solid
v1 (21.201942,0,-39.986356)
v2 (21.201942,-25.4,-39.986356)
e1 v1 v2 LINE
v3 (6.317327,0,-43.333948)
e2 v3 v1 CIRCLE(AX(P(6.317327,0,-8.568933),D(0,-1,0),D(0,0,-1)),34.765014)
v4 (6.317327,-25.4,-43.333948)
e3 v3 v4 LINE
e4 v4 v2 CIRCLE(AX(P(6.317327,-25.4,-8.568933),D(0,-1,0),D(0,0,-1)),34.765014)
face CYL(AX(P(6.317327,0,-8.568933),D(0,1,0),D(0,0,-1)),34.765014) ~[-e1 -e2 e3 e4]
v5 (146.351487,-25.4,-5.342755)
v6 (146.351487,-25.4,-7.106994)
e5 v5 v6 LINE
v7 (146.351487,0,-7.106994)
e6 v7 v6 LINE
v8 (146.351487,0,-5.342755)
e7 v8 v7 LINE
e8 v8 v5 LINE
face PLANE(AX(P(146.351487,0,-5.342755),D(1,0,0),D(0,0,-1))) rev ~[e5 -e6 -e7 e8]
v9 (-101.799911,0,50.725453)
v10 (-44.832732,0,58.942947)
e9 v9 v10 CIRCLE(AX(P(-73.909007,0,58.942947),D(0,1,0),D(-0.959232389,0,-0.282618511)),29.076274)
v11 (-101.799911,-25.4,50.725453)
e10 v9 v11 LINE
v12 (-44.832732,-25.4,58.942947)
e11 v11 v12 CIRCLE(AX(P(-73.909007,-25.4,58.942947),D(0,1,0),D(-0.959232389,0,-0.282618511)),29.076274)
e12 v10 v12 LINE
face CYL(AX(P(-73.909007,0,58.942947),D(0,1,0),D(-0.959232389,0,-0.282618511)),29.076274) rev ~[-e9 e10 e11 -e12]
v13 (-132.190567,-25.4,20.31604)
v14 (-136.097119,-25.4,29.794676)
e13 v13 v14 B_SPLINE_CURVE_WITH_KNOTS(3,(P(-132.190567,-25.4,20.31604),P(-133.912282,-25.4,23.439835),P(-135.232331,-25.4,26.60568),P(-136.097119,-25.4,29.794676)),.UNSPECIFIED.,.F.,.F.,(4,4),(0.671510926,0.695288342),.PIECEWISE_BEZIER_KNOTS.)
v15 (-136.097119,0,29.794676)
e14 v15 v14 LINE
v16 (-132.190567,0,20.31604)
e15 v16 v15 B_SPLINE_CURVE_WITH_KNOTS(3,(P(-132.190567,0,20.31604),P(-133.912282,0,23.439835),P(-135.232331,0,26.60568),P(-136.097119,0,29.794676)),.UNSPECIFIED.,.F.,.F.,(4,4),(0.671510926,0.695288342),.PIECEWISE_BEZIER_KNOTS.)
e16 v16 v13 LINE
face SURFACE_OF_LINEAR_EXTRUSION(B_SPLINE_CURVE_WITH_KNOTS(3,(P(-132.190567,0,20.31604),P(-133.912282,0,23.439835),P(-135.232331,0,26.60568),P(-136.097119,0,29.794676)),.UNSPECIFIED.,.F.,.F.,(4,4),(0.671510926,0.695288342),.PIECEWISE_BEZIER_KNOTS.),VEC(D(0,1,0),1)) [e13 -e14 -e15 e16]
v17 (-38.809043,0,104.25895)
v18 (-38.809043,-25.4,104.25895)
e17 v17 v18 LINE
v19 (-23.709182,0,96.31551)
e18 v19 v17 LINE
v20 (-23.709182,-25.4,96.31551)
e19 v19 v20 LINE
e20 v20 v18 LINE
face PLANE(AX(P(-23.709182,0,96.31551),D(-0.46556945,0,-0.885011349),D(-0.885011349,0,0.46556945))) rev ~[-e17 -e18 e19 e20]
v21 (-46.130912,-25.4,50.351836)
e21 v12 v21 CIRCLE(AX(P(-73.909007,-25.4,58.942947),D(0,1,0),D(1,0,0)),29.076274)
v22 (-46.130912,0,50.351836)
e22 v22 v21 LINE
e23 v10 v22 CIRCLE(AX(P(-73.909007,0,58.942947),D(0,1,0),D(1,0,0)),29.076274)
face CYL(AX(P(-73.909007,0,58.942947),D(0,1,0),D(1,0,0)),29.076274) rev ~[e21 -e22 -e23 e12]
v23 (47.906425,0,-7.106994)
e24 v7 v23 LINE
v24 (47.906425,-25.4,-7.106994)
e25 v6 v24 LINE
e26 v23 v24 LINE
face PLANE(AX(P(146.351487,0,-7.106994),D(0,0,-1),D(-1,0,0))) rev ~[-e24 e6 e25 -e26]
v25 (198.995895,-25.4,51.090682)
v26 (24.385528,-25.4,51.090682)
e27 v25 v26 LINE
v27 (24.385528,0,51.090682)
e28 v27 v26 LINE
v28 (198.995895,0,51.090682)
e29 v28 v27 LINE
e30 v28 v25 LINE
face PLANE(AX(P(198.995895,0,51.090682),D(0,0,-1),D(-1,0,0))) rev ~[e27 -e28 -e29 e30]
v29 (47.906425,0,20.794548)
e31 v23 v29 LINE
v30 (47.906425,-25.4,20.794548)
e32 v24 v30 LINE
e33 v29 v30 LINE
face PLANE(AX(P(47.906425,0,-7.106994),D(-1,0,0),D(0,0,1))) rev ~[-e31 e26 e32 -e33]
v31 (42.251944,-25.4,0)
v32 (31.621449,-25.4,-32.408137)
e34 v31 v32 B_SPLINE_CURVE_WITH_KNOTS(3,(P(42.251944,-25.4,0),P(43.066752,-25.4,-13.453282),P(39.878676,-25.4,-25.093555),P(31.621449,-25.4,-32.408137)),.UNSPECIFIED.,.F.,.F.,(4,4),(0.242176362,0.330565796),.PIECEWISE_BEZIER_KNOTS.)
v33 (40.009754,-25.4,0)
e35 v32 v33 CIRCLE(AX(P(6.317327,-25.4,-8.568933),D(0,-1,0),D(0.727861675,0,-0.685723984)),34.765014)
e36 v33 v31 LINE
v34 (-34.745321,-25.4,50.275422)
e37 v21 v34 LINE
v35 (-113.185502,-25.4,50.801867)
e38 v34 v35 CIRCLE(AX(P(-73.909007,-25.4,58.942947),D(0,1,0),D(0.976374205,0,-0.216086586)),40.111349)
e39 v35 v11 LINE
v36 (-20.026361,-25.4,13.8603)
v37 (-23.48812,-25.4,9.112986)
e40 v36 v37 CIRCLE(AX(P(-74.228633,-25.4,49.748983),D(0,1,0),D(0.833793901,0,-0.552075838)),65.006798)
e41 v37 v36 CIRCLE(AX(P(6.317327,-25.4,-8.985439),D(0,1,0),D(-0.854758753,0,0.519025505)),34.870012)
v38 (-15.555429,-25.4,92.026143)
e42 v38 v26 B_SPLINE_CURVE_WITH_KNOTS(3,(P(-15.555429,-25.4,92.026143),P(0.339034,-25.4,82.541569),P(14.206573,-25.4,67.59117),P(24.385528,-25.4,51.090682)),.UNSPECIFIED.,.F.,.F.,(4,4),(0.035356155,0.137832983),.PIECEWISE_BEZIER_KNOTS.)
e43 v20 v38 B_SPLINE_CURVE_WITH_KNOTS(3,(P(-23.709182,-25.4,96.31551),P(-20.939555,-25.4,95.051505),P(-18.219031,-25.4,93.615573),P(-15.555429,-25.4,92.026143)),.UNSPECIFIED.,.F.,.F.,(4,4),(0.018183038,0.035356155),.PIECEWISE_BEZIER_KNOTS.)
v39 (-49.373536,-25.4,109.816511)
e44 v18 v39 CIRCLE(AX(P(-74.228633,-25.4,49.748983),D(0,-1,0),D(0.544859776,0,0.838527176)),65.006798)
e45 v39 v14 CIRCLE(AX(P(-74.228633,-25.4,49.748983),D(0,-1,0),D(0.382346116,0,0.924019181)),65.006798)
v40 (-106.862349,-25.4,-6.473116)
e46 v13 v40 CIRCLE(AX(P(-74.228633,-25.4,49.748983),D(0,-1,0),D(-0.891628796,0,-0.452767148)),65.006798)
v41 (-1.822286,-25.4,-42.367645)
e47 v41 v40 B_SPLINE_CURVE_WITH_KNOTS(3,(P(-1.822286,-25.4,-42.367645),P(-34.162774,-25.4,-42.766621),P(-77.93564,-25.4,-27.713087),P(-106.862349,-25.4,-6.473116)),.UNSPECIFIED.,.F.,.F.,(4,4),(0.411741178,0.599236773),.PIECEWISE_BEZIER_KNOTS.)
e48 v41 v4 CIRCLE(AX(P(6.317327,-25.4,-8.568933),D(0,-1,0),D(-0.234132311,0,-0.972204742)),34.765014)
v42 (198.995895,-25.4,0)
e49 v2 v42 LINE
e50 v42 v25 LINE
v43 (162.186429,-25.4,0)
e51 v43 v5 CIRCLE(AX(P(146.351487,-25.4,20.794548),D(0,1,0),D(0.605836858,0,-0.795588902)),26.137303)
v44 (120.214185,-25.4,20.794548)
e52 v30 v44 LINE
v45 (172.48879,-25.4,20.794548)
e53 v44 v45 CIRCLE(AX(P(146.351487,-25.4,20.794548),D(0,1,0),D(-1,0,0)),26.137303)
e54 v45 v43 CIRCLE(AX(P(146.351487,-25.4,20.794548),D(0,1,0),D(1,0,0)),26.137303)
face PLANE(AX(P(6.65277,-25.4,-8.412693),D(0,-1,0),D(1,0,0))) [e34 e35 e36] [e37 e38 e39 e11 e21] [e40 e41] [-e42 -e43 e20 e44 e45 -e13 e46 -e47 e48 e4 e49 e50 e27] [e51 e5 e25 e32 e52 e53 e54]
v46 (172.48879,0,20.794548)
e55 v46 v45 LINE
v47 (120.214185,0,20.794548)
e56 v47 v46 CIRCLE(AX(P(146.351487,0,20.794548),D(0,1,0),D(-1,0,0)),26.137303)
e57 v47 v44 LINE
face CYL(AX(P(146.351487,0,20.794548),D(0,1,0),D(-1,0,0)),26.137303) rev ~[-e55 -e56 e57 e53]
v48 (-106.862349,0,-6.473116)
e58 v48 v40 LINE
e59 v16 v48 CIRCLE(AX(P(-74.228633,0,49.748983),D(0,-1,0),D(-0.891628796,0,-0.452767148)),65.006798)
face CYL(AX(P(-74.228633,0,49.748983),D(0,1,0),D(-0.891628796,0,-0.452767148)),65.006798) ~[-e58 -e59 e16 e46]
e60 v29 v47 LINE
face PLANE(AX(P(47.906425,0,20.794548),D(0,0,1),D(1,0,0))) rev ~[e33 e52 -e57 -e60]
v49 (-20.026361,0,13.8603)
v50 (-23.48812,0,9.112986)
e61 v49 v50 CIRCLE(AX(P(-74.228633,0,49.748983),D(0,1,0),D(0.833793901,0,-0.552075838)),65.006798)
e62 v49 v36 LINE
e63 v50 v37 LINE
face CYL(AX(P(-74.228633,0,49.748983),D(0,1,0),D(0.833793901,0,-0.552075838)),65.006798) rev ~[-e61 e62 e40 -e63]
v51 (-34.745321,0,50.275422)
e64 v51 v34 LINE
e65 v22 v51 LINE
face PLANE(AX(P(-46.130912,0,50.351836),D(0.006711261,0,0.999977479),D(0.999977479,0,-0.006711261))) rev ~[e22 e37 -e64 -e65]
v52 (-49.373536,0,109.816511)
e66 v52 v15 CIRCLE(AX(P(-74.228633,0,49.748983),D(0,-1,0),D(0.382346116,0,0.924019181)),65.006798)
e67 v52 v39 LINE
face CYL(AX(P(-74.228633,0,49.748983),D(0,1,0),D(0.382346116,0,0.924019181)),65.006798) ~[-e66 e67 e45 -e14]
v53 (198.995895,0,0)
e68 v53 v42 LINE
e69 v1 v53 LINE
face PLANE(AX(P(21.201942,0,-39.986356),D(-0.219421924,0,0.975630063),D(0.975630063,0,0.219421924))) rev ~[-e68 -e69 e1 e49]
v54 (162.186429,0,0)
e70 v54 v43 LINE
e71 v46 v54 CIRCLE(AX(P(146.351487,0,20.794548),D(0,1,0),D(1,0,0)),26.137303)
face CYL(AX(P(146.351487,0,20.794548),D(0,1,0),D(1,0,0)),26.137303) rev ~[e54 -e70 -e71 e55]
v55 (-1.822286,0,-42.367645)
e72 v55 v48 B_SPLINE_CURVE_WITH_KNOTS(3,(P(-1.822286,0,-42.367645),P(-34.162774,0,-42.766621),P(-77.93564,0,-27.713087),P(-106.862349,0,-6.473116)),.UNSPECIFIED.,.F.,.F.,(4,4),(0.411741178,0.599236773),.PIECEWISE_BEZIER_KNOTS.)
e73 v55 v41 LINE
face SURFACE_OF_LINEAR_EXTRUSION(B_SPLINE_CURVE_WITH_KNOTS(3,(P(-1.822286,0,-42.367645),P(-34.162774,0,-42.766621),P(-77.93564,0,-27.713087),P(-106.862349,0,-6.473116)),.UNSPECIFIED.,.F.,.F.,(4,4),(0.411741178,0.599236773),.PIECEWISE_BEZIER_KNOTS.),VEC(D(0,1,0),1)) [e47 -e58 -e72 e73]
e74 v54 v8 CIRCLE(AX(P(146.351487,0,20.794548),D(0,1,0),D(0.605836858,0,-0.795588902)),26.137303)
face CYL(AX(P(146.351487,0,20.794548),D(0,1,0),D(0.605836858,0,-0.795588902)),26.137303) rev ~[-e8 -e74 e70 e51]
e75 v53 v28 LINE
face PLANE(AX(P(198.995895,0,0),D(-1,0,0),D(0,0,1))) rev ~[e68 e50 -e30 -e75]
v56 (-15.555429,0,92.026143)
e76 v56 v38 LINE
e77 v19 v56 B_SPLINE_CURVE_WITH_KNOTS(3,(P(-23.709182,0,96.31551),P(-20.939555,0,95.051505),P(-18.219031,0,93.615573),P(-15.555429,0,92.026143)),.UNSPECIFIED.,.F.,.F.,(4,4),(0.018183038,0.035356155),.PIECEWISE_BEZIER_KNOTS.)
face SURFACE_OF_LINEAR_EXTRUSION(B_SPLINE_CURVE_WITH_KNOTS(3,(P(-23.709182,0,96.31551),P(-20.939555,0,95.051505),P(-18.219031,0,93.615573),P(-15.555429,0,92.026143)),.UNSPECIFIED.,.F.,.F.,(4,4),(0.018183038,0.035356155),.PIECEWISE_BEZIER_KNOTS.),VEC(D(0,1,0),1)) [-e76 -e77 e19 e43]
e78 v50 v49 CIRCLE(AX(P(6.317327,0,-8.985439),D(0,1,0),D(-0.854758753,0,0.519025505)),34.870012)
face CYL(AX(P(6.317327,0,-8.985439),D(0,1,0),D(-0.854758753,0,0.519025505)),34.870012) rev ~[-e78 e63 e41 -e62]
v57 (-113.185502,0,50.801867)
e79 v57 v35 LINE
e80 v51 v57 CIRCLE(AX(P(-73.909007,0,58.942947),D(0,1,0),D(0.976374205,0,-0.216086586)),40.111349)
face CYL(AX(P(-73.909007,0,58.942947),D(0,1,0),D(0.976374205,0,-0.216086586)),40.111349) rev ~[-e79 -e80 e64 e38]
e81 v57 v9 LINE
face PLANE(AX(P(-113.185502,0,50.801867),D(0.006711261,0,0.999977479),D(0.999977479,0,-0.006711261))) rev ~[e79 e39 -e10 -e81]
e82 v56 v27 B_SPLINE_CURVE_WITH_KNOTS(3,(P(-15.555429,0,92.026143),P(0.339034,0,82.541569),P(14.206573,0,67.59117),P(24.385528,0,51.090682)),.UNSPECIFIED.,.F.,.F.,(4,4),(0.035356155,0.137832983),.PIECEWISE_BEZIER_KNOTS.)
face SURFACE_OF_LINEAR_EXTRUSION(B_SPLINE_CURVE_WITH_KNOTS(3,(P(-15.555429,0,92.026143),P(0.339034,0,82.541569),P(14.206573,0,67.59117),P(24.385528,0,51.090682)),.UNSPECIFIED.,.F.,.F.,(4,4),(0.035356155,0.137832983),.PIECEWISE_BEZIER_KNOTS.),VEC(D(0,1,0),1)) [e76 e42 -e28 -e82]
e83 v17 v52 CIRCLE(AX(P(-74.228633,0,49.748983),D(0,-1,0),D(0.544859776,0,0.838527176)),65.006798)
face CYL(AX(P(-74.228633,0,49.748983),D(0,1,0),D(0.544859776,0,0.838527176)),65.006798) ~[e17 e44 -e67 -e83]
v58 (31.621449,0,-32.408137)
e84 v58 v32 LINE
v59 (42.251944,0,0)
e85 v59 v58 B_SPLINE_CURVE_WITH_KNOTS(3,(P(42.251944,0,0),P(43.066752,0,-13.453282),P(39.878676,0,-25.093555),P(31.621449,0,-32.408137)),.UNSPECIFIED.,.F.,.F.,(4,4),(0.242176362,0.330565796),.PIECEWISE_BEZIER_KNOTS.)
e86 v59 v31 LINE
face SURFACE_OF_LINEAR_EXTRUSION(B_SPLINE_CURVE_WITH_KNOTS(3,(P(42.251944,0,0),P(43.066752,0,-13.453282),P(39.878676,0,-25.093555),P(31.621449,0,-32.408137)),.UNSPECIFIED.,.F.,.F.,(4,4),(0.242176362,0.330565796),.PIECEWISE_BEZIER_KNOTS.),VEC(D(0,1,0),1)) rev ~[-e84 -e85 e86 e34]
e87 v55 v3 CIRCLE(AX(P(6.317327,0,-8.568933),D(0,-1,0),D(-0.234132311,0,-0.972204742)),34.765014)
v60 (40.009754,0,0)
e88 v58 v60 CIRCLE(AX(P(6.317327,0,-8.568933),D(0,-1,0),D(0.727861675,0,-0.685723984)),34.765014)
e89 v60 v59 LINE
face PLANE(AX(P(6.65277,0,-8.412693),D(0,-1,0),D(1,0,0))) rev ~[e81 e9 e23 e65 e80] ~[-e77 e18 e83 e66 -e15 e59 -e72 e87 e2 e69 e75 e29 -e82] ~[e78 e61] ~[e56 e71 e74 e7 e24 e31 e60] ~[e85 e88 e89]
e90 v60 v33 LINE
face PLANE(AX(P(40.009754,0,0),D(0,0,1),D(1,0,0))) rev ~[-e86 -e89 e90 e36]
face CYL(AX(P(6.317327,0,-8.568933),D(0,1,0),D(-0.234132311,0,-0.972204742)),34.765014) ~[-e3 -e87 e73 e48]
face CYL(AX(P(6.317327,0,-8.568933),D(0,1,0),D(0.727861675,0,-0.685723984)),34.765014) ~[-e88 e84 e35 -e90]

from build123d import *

# Parameters (mm, degrees)
F1_DEPTH = 25.4


with BuildPart() as f1:
    # F0 (on Front) → F1 (new body)
    with BuildSketch(Plane.XZ):
        with BuildLine():
            ThreePointArc((-23.4881200852, 9.1129863922), (-25.7569087098, 4.6952436795), (-27.3750988376, 0))
            ThreePointArc((-27.3750988376, 0), (-23.4523587377, -26.5236540337), (-1.822285639, -42.3676450379))
            add(Edge.make_bspline(
                [(31.6214489009, -32.408137431), (24.0381488742, -39.1257279454), (12.1793845571, -42.1949100042), (-1.822285639, -42.3676450379)],
                knots=[0.3305657958, 0.3305657958, 0.3305657958, 0.3305657958, 0.4117411776, 0.4117411776, 0.4117411776, 0.4117411776], degree=3))
            ThreePointArc((31.6214489009, -32.408137431), (39.9732334064, -17.2802023076), (40.0097537836, 0))
            Line((40.0097537836, 0), (24.3855283995, 0))
            Line((24.3855283995, 0), (24.3855283995, 20.8383404807))
            ThreePointArc((24.3855283995, 20.8383404808), (0.9049170427, 25.4619632407), (-20.0263610495, 13.8602998023))
            ThreePointArc((-20.0263610495, 13.8602998023), (-21.7035792641, 11.4475130703), (-23.4881200852, 9.1129863922))
        make_face()
        with BuildLine():
            ThreePointArc((-1.822285639, -42.3676450379), (-23.4523587377, -26.5236540337), (-27.3750988376, 0))
            ThreePointArc((-27.3750988376, 0), (-25.7569087098, 4.6952436795), (-23.4881200852, 9.1129863922))
            ThreePointArc((-23.4881200852, 9.1129863922), (-62.2831037982, -14.1508466737), (-106.8623494937, -6.4731163171))
            add(Edge.make_bspline(
                [(-1.822285639, -42.3676450379), (-34.1627739251, -42.7666213928), (-77.9356396487, -27.7130872373), (-106.8623494937, -6.4731163171)],
                knots=[0.4117411776, 0.4117411776, 0.4117411776, 0.4117411776, 0.5992367726, 0.5992367726, 0.5992367726, 0.5992367726], degree=3))
        make_face()
        with BuildLine():
            add(Edge.make_bspline(
                [(31.6214489009, -32.408137431), (24.0381488742, -39.1257279454), (12.1793845571, -42.1949100042), (-1.822285639, -42.3676450379)],
                knots=[0.3305657958, 0.3305657958, 0.3305657958, 0.3305657958, 0.4117411776, 0.4117411776, 0.4117411776, 0.4117411776], degree=3))
            ThreePointArc((-1.822285639, -42.3676450379), (2.2189423584, -43.0915267187), (6.317327473, -43.3339475664))
            Line((6.317327473, -43.3339475664), (21.2019422511, -39.9863561607))
            ThreePointArc((21.2019422511, -39.9863561607), (26.7658232425, -36.6841469116), (31.6214489009, -32.408137431))
        make_face()
        with BuildLine():
            ThreePointArc((-106.8623494937, -6.4731163171), (-62.2831037982, -14.1508466737), (-23.4881200852, 9.1129863922))
            ThreePointArc((-23.4881200852, 9.1129863922), (-21.8574061869, 11.5596842489), (-20.0263610495, 13.8602998023))
            ThreePointArc((-20.0263610495, 13.8602998023), (-11.9815447312, 31.0090830109), (-9.2218346427, 49.7489825666))
            ThreePointArc((-9.2218346427, 49.7489825666), (-15.373040222, 77.3515736193), (-32.6625531747, 99.7304275837))
            add(Edge.make_bspline(
                [(-136.0971185339, 29.794675775), (-147.1795152867, 70.6622045283), (-83.4949169934, 115.3318185014), (-32.6625531747, 99.7304275837)],
                knots=[0.6952883419, 0.6952883419, 0.6952883419, 0.6952883419, 1, 1, 1, 1], degree=3))
            ThreePointArc((-136.0971185339, 29.794675775), (-134.3309912676, 24.9782257744), (-132.1905665466, 20.3160397911))
            add(Edge.make_bspline(
                [(-106.8623494937, -6.4731163171), (-118.0127633165, 1.7142809574), (-126.9572157407, 10.8209088266), (-132.1905665466, 20.3160397911)],
                knots=[0.5992367726, 0.5992367726, 0.5992367726, 0.5992367726, 0.6715109264, 0.6715109264, 0.6715109264, 0.6715109264], degree=3))
        make_face()
        with BuildLine():
            ThreePointArc((-34.7453205512, 50.2754222832), (-74.1782043044, 18.8325014661), (-113.1855020537, 50.8018666913))
            Line((-113.1855020537, 50.8018666913), (-101.7999106632, 50.7254532919))
            ThreePointArc((-101.7999106632, 50.7254532918), (-78.0602804594, 87.7213526899), (-44.8327322387, 58.9429466583))
            ThreePointArc((-44.8327322387, 58.9429466583), (-45.1591089284, 54.5986268514), (-46.1309119417, 50.3518356826))
            Line((-46.1309119417, 50.3518356826), (-34.7453205512, 50.2754222832))
        make_face(mode=Mode.SUBTRACT)
        with BuildLine():
            Line((21.2019422511, -39.9863561607), (6.317327473, -43.3339475664))
            ThreePointArc((6.317327473, -43.3339475664), (13.9455337712, -42.486726351), (21.2019422511, -39.9863561607))
        make_face()
        with BuildLine():
            add(Edge.make_bspline(
                [(42.2519440934, 0), (43.0667519502, -13.4532818738), (39.8786763522, -25.0935550451), (31.6214489009, -32.408137431)],
                knots=[0.2421763625, 0.2421763625, 0.2421763625, 0.2421763625, 0.3305657958, 0.3305657958, 0.3305657958, 0.3305657958], degree=3))
            ThreePointArc((31.6214489009, -32.408137431), (26.7658232425, -36.6841469116), (21.2019422511, -39.9863561607))
            Line((21.2019422511, -39.9863561607), (198.9958948854, 0))
            Line((198.9958948854, 0), (162.1864286042, 0))
            ThreePointArc((162.1864286042, 0), (154.7074790766, -3.9710732295), (146.3514873037, -5.3427547241))
            Line((146.3514873037, -5.3427547241), (146.3514873037, -7.1069937982))
            Line((146.3514873037, -7.1069937982), (47.9064245235, -7.1069937982))
            Line((47.9064245235, -7.1069937982), (47.9064245235, 0))
            Line((47.9064245235, 0), (42.2519440934, 0))
        make_face()
        with BuildLine():
            ThreePointArc((-132.1905665466, 20.3160397911), (-121.4653525437, 5.0883042782), (-106.8623494937, -6.4731163171))
            add(Edge.make_bspline(
                [(-106.8623494937, -6.4731163171), (-118.0127633165, 1.7142809574), (-126.9572157407, 10.8209088266), (-132.1905665466, 20.3160397911)],
                knots=[0.5992367726, 0.5992367726, 0.5992367726, 0.5992367726, 0.6715109264, 0.6715109264, 0.6715109264, 0.6715109264], degree=3))
        make_face()
        with BuildLine():
            ThreePointArc((-9.2218346427, 49.7489825666), (-11.9815447312, 31.0090830109), (-20.0263610495, 13.8602998023))
            ThreePointArc((-20.0263610495, 13.8602998023), (0.9049170427, 25.4619632407), (24.3855283995, 20.8383404808))
            Line((24.3855283995, 20.8383404807), (24.3855283995, 51.0906824548))
            add(Edge.make_bspline(
                [(-15.5554291457, 92.0261433749), (0.3390335994, 82.5415688484), (14.2065732282, 67.591169523), (24.3855283995, 51.0906824548)],
                knots=[0.0353561549, 0.0353561549, 0.0353561549, 0.0353561549, 0.1378329831, 0.1378329831, 0.1378329831, 0.1378329831], degree=3))
            Line((-15.5554291457, 92.0261433749), (-23.7091819765, 96.3155100856))
            add(Edge.make_bspline(
                [(-32.6625531747, 99.7304275837), (-29.6292369493, 98.7994468334), (-26.6416857173, 97.653849539), (-23.7091819765, 96.3155100856)],
                knots=[0, 0, 0, 0, 0.0181830383, 0.0181830383, 0.0181830383, 0.0181830383], degree=3))
            ThreePointArc((-32.6625531747, 99.7304275837), (-15.373040222, 77.3515736193), (-9.2218346427, 49.7489825666))
        make_face()
        with BuildLine():
            Line((24.3855283995, 0), (40.0097537836, 0))
            ThreePointArc((40.0097537836, 0), (34.2162475505, 11.9326862666), (24.3855283995, 20.8383404808))
            Line((24.3855283995, 20.8383404807), (24.3855283995, 0))
        make_face()
        with BuildLine():
            ThreePointArc((24.3855283995, 20.8383404808), (34.2162475505, 11.9326862666), (40.0097537836, 0))
            Line((40.0097537836, 0), (42.2519440934, 0))
            add(Edge.make_bspline(
                [(24.3855283995, 51.0906824548), (34.7498868563, 34.2896493617), (41.2900666127, 15.8815465109), (42.2519440934, 0)],
                knots=[0.1378329831, 0.1378329831, 0.1378329831, 0.1378329831, 0.2421763625, 0.2421763625, 0.2421763625, 0.2421763625], degree=3))
            Line((24.3855283995, 51.0906824548), (24.3855283995, 20.8383404807))
        make_face()
        with BuildLine():
            add(Edge.make_bspline(
                [(24.3855283995, 51.0906824548), (34.7498868563, 34.2896493617), (41.2900666127, 15.8815465109), (42.2519440934, 0)],
                knots=[0.1378329831, 0.1378329831, 0.1378329831, 0.1378329831, 0.2421763625, 0.2421763625, 0.2421763625, 0.2421763625], degree=3))
            Line((42.2519440934, 0), (47.9064245235, 0))
            Line((47.9064245235, 0), (47.9064245235, 20.7945478899))
            Line((47.9064245235, 20.7945478899), (120.2141846897, 20.7945478899))
            ThreePointArc((120.2141846897, 20.7945478899), (146.3514873037, 46.931850504), (172.4887899177, 20.7945478899))
            ThreePointArc((172.4887899177, 20.7945478899), (169.7720043836, 9.1911877022), (162.1864286042, 0))
            Line((162.1864286042, 0), (198.9958948854, 0))
            Line((198.9958948854, 0), (198.9958948854, 51.0906824548))
            Line((198.9958948854, 51.0906824548), (24.3855283995, 51.0906824548))
        make_face()
        with BuildLine():
            add(Edge.make_bspline(
                [(-132.1905665466, 20.3160397911), (-133.9122824029, 23.4398352609), (-135.2323312991, 26.6056799314), (-136.0971185339, 29.794675775)],
                knots=[0.6715109264, 0.6715109264, 0.6715109264, 0.6715109264, 0.6952883419, 0.6952883419, 0.6952883419, 0.6952883419], degree=3))
            ThreePointArc((-132.1905665466, 20.3160397911), (-134.3309912676, 24.9782257744), (-136.0971185339, 29.794675775))
        make_face()
        with BuildLine():
            ThreePointArc((-49.373536191, 109.8165112697), (-118.3123179762, 97.5246309308), (-136.0971185339, 29.794675775))
            add(Edge.make_bspline(
                [(-136.0971185339, 29.794675775), (-147.1795152867, 70.6622045283), (-83.4949169934, 115.3318185014), (-32.6625531747, 99.7304275837)],
                knots=[0.6952883419, 0.6952883419, 0.6952883419, 0.6952883419, 1, 1, 1, 1], degree=3))
            ThreePointArc((-32.6625531747, 99.7304275837), (-35.6692605933, 102.0849992123), (-38.8090434498, 104.2589496877))
            Line((-38.8090434498, 104.2589496877), (-49.373536191, 109.8165112697))
        make_face()
        with BuildLine():
            ThreePointArc((-38.8090434498, 104.2589496877), (-35.6692605933, 102.0849992123), (-32.6625531747, 99.7304275837))
            add(Edge.make_bspline(
                [(-32.6625531747, 99.7304275837), (-29.6292369493, 98.7994468334), (-26.6416857173, 97.653849539), (-23.7091819765, 96.3155100856)],
                knots=[0, 0, 0, 0, 0.0181830383, 0.0181830383, 0.0181830383, 0.0181830383], degree=3))
            Line((-23.7091819765, 96.3155100856), (-38.8090434498, 104.2589496877))
        make_face()
        with BuildLine():
            Line((-23.7091819765, 96.3155100856), (-15.5554291457, 92.0261433749))
            add(Edge.make_bspline(
                [(-23.7091819765, 96.3155100856), (-20.9395552466, 95.0515046312), (-18.2190309331, 93.615572981), (-15.5554291457, 92.0261433749)],
                knots=[0.0181830383, 0.0181830383, 0.0181830383, 0.0181830383, 0.0353561549, 0.0353561549, 0.0353561549, 0.0353561549], degree=3))
        make_face()
        with BuildLine():
            ThreePointArc((-38.8090434498, 104.2589496877), (-43.9634537245, 107.2807369641), (-49.373536191, 109.8165112697))
            Line((-49.373536191, 109.8165112697), (-38.8090434498, 104.2589496877))
        make_face()
    extrude(amount=F1_DEPTH)


solid = f1.part
